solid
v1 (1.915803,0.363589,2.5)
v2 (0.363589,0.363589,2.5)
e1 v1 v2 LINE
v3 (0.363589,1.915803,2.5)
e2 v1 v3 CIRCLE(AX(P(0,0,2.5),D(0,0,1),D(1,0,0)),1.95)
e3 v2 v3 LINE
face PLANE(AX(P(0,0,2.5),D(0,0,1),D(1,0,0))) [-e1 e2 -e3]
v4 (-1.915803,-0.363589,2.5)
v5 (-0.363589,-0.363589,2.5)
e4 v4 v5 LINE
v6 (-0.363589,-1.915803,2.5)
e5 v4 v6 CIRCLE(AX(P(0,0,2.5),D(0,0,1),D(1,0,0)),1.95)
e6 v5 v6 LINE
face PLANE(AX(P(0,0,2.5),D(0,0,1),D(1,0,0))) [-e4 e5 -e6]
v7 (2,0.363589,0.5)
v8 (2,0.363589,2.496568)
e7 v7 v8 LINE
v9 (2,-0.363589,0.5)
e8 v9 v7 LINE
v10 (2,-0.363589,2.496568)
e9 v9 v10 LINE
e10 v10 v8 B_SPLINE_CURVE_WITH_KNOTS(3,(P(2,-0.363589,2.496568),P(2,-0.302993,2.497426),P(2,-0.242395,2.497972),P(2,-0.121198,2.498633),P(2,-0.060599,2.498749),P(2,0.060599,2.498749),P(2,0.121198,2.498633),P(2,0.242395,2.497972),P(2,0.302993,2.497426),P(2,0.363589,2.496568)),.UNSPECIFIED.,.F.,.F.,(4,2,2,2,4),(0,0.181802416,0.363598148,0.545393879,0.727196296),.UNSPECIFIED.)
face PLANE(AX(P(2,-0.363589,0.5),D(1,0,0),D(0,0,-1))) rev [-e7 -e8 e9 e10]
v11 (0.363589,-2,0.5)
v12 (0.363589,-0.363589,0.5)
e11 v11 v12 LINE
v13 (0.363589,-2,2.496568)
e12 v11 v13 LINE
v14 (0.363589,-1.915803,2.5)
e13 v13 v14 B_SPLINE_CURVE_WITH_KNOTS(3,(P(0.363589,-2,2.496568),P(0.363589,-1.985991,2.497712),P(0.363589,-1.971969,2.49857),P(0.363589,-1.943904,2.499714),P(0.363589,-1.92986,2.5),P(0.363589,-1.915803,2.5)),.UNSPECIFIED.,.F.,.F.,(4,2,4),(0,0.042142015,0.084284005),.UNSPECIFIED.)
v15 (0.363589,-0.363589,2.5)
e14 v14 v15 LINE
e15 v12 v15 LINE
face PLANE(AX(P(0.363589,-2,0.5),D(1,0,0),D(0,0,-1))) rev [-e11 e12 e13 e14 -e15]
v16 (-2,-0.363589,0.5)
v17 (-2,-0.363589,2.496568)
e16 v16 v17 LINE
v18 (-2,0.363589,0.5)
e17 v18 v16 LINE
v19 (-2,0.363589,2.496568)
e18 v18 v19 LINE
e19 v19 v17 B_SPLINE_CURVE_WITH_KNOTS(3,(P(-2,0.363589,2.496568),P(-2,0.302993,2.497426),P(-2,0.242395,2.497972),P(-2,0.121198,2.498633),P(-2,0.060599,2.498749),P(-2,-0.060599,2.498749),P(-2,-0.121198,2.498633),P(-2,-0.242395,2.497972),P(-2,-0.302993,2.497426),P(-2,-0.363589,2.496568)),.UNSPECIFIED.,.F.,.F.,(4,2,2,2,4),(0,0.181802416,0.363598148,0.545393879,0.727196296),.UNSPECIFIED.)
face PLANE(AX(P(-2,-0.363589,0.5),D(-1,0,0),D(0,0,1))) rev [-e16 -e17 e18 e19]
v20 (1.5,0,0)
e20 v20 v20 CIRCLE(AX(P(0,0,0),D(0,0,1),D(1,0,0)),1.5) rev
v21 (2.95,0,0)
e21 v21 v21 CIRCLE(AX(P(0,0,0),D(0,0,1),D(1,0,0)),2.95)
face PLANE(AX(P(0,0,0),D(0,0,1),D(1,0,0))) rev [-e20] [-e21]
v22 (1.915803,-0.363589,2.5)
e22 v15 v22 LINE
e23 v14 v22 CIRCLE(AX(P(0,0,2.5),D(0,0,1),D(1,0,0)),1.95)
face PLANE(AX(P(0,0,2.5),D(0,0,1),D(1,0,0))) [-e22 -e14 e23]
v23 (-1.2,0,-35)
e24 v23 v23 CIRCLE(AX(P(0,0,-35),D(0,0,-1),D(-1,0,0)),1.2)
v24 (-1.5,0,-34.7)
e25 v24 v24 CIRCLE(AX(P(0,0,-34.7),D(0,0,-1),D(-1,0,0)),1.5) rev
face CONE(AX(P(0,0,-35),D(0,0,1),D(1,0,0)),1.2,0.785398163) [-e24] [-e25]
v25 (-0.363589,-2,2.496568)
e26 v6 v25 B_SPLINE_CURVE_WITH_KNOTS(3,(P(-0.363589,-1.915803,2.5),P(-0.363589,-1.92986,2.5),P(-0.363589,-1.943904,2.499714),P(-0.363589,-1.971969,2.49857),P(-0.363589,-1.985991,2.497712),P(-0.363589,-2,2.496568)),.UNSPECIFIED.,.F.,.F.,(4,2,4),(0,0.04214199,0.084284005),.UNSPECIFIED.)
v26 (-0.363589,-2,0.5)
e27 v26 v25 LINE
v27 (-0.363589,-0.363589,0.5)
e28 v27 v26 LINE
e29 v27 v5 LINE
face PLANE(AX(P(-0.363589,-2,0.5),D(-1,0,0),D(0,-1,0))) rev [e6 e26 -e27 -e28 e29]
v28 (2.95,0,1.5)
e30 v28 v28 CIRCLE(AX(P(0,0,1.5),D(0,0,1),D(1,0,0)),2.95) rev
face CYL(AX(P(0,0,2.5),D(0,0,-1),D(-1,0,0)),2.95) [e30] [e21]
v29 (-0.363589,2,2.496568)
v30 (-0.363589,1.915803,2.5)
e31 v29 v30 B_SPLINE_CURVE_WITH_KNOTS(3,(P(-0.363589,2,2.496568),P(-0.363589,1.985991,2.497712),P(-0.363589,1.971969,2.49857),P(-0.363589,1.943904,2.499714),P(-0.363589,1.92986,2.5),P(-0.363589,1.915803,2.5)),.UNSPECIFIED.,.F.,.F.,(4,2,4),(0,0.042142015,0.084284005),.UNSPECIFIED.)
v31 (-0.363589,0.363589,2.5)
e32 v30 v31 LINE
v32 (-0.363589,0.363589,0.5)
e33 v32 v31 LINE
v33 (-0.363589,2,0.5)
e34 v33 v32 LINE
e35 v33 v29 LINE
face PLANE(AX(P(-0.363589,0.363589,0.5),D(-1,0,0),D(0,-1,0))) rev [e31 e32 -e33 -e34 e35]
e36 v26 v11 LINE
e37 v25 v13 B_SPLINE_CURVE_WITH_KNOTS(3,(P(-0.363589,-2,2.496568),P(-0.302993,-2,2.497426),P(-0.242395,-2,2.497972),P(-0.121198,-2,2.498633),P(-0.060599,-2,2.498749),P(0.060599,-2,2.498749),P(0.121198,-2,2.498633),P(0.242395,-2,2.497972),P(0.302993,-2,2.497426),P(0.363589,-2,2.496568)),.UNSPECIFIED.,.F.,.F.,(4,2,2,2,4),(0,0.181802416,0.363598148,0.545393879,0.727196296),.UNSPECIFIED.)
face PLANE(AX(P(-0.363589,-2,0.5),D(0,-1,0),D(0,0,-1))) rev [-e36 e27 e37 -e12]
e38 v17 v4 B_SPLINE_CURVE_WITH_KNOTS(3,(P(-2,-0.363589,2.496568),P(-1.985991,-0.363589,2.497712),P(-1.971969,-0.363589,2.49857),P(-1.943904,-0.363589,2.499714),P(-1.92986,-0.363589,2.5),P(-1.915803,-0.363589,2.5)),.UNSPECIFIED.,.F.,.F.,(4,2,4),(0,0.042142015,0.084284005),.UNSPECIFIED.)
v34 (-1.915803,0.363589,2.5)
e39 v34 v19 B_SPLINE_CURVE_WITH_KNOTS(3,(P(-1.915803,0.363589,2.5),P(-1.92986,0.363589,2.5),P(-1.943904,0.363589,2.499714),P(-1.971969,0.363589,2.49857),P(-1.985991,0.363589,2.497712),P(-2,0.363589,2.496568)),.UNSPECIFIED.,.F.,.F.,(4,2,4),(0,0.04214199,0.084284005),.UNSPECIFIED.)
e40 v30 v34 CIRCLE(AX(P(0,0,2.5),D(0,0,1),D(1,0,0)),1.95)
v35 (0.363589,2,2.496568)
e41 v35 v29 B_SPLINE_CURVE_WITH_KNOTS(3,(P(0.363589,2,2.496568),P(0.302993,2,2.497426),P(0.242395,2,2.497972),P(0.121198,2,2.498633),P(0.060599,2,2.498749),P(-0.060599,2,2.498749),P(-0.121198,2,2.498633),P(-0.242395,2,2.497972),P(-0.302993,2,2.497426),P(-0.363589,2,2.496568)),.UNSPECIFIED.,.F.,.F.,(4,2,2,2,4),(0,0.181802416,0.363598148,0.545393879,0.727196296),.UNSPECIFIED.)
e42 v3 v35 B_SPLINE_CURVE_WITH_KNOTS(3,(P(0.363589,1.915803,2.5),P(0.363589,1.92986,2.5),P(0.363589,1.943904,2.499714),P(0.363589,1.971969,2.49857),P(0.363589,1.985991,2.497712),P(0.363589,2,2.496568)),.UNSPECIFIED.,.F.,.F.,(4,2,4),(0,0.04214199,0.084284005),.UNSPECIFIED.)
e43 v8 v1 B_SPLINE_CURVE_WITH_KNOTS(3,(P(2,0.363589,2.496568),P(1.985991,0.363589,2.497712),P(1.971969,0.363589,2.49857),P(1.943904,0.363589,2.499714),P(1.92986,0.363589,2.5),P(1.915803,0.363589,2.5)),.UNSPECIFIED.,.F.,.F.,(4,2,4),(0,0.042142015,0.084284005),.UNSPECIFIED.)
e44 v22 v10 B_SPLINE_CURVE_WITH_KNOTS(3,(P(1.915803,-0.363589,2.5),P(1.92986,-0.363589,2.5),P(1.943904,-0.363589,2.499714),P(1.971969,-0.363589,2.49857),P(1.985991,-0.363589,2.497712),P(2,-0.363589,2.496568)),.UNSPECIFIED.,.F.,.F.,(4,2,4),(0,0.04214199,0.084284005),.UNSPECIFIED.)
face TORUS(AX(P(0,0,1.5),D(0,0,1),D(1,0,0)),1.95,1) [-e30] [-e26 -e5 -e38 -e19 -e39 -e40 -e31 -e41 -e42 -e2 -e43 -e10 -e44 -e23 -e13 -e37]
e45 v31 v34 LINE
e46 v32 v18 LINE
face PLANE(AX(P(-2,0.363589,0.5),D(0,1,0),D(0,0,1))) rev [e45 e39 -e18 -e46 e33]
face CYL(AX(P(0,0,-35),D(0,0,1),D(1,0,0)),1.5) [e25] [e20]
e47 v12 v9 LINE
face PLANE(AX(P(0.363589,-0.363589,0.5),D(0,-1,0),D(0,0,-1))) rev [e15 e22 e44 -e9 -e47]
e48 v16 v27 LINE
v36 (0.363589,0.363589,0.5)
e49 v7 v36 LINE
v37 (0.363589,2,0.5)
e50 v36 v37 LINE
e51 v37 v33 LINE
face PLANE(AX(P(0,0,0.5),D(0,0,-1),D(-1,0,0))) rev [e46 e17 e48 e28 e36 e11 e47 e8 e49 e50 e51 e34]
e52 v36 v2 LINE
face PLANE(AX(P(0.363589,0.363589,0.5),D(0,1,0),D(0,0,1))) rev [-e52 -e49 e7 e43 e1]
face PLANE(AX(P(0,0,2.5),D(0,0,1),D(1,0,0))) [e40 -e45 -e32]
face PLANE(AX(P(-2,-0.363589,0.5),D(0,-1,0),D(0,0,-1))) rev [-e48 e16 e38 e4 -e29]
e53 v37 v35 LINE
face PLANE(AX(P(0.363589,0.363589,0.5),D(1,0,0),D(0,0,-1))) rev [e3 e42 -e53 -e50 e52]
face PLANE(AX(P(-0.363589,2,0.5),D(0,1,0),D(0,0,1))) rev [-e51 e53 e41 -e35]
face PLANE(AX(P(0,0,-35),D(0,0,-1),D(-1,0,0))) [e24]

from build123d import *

# Parameters (mm, degrees)
SKETCH1_R           = 2.95
BOSS_EXTRUDE1_DEPTH = 2.5
SKETCH2_R           = 1.5
BOSS_EXTRUDE2_DEPTH = 35
CHAMFER1_SIZE       = 0.3
CUT_EXTRUDE1_DEPTH  = 2
FILLET1_R           = 1


with BuildPart() as part:
    # Sketch1 → Boss-Extrude1 (new body)
    with BuildSketch(Plane.XY):
        Circle(SKETCH1_R)
    extrude(amount=BOSS_EXTRUDE1_DEPTH)

    # Sketch2 → Boss-Extrude2 (add)
    with BuildSketch(Plane(origin=(0, 0, 0), x_dir=(-1, 0, 0), z_dir=(0, 0, -1))):
        with Locations(Location((0, 0, 0), (0, 0, 180))):
            Circle(SKETCH2_R)
    extrude(amount=BOSS_EXTRUDE2_DEPTH)

    # Chamfer1
    chamfer1_edges = [part.edges().sort_by_distance(p)[0] for p in [
        (-1.5, 0, -35),
    ]]
    chamfer(chamfer1_edges, length=CHAMFER1_SIZE)

    # Sketch3 → Cut-Extrude1 (cut)
    with BuildSketch(Plane.XY.offset(2.5)):
        Polygon((0.363589324, 0.363589324), (2, 0.363589324), (2, -0.363589324), (0.363589324, -0.363589324), (0.363589324, -2), (-0.363589324, -2), (-0.363589324, -0.363589324), (-2, -0.363589324), (-2, 0.363589324), (-0.363589324, 0.363589324), (-0.363589324, 2), (0.363589324, 2), align=None)
    extrude(amount=-CUT_EXTRUDE1_DEPTH, mode=Mode.SUBTRACT)

    # Fillet1
    # the kernel refuses this fillet: 1 mm, written as the material it takes off along each edge
    with BuildSketch(Plane(origin=(0, 0, 2.5), x_dir=(1, 0, 0), z_dir=(0, -1, 0))) as fillet1_piece_1:
        with BuildLine():
            CenterArc((2.95 - FILLET1_R, -FILLET1_R), FILLET1_R, 0, 90)
            Line((2.95 - FILLET1_R, 0), (2.95, 0))
            Line((2.95, 0), (2.95, -FILLET1_R))
        make_face()
    revolve(axis=Axis((0, 0, 2.5), (0, 0, 1)), mode=Mode.SUBTRACT)


solid = part.part
